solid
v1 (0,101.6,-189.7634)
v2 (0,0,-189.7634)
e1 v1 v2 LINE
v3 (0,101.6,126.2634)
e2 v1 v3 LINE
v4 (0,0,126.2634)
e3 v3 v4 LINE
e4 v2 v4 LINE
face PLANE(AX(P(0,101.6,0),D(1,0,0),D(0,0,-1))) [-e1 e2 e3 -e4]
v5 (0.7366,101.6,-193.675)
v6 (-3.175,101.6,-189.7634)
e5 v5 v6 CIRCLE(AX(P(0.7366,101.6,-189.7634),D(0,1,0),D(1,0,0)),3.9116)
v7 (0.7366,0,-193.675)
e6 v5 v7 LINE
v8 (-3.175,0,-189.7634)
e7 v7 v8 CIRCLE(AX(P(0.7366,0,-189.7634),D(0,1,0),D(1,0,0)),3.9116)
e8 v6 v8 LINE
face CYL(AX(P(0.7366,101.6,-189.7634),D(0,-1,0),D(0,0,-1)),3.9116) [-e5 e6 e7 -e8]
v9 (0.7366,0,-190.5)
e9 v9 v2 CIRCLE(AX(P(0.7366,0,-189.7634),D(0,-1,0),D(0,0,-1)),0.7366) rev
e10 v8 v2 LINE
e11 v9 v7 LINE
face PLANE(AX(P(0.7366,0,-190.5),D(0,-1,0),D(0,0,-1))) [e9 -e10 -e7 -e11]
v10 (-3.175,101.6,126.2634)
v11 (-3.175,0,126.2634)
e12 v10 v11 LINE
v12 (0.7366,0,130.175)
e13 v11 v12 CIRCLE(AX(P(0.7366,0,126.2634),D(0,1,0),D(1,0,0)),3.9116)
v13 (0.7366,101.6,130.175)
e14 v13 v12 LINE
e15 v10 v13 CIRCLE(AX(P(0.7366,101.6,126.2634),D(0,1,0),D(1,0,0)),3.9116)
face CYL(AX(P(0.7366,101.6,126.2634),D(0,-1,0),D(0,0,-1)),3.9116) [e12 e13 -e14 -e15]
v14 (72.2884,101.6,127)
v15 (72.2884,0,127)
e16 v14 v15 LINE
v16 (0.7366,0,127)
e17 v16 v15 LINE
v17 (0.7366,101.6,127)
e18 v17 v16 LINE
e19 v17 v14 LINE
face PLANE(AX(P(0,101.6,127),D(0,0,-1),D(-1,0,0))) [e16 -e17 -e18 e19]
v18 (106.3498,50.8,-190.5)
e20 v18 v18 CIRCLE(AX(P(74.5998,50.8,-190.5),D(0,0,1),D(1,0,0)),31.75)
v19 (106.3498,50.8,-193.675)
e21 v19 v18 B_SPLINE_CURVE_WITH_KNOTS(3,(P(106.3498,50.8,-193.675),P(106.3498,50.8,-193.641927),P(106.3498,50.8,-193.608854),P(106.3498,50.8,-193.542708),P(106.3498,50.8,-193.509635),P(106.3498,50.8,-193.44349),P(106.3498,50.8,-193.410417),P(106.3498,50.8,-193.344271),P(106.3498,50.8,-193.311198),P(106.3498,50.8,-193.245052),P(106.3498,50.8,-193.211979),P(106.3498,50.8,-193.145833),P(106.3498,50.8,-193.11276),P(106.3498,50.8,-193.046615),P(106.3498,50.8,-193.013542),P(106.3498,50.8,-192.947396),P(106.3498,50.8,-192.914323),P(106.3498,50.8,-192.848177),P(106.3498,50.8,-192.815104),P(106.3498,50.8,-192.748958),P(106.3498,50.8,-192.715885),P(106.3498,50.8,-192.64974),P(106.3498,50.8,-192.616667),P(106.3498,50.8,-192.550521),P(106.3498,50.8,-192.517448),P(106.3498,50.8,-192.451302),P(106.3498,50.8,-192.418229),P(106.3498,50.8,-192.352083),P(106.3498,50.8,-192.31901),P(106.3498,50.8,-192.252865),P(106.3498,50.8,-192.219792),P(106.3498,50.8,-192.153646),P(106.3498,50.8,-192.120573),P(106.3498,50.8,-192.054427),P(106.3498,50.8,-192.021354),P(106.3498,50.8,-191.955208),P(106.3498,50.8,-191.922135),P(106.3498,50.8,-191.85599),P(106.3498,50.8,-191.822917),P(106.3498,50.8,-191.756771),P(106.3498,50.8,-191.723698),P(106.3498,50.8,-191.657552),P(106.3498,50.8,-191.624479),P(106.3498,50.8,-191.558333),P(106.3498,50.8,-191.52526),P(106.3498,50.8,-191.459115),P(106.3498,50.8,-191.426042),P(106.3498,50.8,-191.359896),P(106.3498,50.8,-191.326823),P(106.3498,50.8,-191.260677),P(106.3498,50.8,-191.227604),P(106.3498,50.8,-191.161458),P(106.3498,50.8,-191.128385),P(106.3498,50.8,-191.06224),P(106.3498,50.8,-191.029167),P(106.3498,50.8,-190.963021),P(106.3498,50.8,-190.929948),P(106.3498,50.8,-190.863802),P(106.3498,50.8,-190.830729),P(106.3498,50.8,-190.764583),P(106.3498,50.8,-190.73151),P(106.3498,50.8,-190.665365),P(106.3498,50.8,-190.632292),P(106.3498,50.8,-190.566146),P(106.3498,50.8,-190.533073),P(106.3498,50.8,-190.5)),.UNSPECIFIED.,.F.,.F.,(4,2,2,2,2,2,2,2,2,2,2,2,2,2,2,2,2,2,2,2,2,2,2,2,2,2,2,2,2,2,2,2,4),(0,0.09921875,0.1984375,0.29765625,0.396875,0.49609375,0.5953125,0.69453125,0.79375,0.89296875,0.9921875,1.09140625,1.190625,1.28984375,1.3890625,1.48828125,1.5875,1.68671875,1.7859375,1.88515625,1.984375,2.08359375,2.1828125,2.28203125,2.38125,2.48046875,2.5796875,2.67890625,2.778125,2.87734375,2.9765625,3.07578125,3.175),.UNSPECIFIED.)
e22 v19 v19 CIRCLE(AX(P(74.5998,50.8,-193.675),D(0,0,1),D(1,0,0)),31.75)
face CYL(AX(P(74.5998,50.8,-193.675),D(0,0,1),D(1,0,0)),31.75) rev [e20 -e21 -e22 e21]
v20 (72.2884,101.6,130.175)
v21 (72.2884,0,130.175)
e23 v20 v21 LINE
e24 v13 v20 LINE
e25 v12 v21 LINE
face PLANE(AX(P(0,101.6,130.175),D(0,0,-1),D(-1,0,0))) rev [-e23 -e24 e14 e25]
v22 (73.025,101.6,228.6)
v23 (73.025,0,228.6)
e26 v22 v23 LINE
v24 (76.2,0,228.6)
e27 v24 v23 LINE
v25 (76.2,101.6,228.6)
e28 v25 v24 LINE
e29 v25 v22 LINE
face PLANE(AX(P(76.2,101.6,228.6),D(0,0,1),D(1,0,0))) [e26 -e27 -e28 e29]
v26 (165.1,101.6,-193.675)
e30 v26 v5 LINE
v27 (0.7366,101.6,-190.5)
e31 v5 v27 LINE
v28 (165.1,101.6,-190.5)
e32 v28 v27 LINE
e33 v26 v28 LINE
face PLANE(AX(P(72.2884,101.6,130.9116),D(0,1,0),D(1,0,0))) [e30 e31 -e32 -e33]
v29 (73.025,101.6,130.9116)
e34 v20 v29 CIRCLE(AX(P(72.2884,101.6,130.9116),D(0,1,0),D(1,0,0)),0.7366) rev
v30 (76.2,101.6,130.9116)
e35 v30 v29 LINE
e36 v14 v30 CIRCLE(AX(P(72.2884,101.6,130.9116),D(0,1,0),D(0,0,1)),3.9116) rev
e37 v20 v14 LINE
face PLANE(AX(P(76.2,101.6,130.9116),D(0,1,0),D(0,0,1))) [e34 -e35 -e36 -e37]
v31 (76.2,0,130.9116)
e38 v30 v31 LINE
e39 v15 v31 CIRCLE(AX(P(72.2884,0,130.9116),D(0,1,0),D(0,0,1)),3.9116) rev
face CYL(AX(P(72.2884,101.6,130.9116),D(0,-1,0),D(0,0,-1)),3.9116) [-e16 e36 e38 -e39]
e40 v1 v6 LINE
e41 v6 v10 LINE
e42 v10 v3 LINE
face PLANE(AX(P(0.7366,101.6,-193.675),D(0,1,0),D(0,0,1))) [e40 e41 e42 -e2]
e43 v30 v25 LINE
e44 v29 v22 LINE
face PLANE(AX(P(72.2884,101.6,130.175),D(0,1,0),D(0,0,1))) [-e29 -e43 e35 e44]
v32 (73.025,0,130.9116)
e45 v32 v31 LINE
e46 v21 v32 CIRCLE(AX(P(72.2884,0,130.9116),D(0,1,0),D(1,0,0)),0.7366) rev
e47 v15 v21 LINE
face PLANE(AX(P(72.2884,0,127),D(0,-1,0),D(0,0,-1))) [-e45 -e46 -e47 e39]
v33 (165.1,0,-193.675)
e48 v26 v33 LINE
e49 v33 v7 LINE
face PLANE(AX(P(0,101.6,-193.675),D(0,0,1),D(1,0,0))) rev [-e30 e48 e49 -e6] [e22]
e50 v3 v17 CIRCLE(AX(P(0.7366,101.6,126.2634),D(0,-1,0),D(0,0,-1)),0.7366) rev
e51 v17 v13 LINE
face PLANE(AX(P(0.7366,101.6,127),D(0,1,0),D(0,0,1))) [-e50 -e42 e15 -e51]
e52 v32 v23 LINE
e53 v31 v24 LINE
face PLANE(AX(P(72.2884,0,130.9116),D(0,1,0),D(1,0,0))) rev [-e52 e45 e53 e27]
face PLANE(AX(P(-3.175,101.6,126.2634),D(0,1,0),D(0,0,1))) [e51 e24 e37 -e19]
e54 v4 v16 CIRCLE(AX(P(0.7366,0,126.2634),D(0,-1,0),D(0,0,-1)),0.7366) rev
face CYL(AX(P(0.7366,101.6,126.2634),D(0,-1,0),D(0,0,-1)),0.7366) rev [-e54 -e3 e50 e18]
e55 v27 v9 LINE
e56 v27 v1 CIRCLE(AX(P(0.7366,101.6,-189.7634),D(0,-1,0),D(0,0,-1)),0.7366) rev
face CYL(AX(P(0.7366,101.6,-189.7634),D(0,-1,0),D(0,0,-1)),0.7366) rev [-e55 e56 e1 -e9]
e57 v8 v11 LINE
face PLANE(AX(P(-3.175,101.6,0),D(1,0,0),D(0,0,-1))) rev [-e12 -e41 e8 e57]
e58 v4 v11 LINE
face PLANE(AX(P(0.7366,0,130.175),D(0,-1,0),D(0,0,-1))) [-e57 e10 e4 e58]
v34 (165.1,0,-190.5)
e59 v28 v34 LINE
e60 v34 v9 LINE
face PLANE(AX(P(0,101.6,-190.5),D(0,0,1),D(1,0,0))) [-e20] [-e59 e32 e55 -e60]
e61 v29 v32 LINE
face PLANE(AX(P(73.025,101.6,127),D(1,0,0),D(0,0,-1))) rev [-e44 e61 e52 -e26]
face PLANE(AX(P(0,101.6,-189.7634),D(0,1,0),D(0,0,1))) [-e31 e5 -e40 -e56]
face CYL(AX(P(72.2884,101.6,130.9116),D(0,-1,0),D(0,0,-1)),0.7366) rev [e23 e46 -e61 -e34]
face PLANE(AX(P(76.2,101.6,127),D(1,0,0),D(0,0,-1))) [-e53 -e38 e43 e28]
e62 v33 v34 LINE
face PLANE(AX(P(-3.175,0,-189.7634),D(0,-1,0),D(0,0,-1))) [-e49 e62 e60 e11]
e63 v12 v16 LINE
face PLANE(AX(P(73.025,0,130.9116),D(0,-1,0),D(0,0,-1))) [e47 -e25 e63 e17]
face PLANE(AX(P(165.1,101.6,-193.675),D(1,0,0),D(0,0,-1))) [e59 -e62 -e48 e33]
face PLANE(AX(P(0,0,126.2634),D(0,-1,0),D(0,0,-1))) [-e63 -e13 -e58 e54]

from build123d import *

# Parameters (mm, degrees)
BASE_FLANGE1_DEPTH = 101.6
SKETCH6_R          = 31.75
CUT_EXTRUDE1_DEPTH = 462.763337653


# Sheet-metal steps are written as plain solids
with BuildPart() as part:
    # Sketch1 → Base-Flange1 (new body)
    with BuildSketch(Plane(origin=(0, 0, 0), x_dir=(1, 0, 0), z_dir=(0, 1, 0))):
        with BuildLine():
            Line((76.2, -228.6), (76.2, -130.9116))
            ThreePointArc((76.2, -130.9116), (75.054318885, -128.145681115), (72.2884, -127))
            Line((72.2884, -127), (0.7366, -127))
            ThreePointArc((0.7366, -127), (0.215745145, -126.784254855), (0, -126.2634))
            Line((0, -126.2634), (0, 0))
            Line((0, 0), (0, 189.7634))
            ThreePointArc((0, 189.7634), (0.215745145, 190.284254855), (0.7366, 190.5))
            Line((0.7366, 190.5), (165.1, 190.5))
            Line((165.1, 190.5), (165.1, 193.675))
            Line((165.1, 193.675), (0.7366, 193.675))
            ThreePointArc((0.7366, 193.675), (-2.029318885, 192.529318885), (-3.175, 189.7634))
            Line((-3.175, 189.7634), (-3.175, 0))
            Line((-3.175, 0), (-3.175, -126.2634))
            ThreePointArc((-3.175, -126.2634), (-2.029318885, -129.029318885), (0.7366, -130.175))
            Line((0.7366, -130.175), (72.2884, -130.175))
            ThreePointArc((72.2884, -130.175), (72.809254855, -130.390745145), (73.025, -130.9116))
            Line((73.025, -130.9116), (73.025, -228.6))
            Line((73.025, -228.6), (76.2, -228.6))
        make_face()
    extrude(amount=BASE_FLANGE1_DEPTH)

    # Sketch6 → Cut-Extrude1 (cut, through all)
    with BuildSketch(Plane.XY.offset(-190.5)):
        with Locations((74.5998, 50.8)):
            Circle(SKETCH6_R)
    extrude(amount=-CUT_EXTRUDE1_DEPTH, mode=Mode.SUBTRACT)


solid = part.part
